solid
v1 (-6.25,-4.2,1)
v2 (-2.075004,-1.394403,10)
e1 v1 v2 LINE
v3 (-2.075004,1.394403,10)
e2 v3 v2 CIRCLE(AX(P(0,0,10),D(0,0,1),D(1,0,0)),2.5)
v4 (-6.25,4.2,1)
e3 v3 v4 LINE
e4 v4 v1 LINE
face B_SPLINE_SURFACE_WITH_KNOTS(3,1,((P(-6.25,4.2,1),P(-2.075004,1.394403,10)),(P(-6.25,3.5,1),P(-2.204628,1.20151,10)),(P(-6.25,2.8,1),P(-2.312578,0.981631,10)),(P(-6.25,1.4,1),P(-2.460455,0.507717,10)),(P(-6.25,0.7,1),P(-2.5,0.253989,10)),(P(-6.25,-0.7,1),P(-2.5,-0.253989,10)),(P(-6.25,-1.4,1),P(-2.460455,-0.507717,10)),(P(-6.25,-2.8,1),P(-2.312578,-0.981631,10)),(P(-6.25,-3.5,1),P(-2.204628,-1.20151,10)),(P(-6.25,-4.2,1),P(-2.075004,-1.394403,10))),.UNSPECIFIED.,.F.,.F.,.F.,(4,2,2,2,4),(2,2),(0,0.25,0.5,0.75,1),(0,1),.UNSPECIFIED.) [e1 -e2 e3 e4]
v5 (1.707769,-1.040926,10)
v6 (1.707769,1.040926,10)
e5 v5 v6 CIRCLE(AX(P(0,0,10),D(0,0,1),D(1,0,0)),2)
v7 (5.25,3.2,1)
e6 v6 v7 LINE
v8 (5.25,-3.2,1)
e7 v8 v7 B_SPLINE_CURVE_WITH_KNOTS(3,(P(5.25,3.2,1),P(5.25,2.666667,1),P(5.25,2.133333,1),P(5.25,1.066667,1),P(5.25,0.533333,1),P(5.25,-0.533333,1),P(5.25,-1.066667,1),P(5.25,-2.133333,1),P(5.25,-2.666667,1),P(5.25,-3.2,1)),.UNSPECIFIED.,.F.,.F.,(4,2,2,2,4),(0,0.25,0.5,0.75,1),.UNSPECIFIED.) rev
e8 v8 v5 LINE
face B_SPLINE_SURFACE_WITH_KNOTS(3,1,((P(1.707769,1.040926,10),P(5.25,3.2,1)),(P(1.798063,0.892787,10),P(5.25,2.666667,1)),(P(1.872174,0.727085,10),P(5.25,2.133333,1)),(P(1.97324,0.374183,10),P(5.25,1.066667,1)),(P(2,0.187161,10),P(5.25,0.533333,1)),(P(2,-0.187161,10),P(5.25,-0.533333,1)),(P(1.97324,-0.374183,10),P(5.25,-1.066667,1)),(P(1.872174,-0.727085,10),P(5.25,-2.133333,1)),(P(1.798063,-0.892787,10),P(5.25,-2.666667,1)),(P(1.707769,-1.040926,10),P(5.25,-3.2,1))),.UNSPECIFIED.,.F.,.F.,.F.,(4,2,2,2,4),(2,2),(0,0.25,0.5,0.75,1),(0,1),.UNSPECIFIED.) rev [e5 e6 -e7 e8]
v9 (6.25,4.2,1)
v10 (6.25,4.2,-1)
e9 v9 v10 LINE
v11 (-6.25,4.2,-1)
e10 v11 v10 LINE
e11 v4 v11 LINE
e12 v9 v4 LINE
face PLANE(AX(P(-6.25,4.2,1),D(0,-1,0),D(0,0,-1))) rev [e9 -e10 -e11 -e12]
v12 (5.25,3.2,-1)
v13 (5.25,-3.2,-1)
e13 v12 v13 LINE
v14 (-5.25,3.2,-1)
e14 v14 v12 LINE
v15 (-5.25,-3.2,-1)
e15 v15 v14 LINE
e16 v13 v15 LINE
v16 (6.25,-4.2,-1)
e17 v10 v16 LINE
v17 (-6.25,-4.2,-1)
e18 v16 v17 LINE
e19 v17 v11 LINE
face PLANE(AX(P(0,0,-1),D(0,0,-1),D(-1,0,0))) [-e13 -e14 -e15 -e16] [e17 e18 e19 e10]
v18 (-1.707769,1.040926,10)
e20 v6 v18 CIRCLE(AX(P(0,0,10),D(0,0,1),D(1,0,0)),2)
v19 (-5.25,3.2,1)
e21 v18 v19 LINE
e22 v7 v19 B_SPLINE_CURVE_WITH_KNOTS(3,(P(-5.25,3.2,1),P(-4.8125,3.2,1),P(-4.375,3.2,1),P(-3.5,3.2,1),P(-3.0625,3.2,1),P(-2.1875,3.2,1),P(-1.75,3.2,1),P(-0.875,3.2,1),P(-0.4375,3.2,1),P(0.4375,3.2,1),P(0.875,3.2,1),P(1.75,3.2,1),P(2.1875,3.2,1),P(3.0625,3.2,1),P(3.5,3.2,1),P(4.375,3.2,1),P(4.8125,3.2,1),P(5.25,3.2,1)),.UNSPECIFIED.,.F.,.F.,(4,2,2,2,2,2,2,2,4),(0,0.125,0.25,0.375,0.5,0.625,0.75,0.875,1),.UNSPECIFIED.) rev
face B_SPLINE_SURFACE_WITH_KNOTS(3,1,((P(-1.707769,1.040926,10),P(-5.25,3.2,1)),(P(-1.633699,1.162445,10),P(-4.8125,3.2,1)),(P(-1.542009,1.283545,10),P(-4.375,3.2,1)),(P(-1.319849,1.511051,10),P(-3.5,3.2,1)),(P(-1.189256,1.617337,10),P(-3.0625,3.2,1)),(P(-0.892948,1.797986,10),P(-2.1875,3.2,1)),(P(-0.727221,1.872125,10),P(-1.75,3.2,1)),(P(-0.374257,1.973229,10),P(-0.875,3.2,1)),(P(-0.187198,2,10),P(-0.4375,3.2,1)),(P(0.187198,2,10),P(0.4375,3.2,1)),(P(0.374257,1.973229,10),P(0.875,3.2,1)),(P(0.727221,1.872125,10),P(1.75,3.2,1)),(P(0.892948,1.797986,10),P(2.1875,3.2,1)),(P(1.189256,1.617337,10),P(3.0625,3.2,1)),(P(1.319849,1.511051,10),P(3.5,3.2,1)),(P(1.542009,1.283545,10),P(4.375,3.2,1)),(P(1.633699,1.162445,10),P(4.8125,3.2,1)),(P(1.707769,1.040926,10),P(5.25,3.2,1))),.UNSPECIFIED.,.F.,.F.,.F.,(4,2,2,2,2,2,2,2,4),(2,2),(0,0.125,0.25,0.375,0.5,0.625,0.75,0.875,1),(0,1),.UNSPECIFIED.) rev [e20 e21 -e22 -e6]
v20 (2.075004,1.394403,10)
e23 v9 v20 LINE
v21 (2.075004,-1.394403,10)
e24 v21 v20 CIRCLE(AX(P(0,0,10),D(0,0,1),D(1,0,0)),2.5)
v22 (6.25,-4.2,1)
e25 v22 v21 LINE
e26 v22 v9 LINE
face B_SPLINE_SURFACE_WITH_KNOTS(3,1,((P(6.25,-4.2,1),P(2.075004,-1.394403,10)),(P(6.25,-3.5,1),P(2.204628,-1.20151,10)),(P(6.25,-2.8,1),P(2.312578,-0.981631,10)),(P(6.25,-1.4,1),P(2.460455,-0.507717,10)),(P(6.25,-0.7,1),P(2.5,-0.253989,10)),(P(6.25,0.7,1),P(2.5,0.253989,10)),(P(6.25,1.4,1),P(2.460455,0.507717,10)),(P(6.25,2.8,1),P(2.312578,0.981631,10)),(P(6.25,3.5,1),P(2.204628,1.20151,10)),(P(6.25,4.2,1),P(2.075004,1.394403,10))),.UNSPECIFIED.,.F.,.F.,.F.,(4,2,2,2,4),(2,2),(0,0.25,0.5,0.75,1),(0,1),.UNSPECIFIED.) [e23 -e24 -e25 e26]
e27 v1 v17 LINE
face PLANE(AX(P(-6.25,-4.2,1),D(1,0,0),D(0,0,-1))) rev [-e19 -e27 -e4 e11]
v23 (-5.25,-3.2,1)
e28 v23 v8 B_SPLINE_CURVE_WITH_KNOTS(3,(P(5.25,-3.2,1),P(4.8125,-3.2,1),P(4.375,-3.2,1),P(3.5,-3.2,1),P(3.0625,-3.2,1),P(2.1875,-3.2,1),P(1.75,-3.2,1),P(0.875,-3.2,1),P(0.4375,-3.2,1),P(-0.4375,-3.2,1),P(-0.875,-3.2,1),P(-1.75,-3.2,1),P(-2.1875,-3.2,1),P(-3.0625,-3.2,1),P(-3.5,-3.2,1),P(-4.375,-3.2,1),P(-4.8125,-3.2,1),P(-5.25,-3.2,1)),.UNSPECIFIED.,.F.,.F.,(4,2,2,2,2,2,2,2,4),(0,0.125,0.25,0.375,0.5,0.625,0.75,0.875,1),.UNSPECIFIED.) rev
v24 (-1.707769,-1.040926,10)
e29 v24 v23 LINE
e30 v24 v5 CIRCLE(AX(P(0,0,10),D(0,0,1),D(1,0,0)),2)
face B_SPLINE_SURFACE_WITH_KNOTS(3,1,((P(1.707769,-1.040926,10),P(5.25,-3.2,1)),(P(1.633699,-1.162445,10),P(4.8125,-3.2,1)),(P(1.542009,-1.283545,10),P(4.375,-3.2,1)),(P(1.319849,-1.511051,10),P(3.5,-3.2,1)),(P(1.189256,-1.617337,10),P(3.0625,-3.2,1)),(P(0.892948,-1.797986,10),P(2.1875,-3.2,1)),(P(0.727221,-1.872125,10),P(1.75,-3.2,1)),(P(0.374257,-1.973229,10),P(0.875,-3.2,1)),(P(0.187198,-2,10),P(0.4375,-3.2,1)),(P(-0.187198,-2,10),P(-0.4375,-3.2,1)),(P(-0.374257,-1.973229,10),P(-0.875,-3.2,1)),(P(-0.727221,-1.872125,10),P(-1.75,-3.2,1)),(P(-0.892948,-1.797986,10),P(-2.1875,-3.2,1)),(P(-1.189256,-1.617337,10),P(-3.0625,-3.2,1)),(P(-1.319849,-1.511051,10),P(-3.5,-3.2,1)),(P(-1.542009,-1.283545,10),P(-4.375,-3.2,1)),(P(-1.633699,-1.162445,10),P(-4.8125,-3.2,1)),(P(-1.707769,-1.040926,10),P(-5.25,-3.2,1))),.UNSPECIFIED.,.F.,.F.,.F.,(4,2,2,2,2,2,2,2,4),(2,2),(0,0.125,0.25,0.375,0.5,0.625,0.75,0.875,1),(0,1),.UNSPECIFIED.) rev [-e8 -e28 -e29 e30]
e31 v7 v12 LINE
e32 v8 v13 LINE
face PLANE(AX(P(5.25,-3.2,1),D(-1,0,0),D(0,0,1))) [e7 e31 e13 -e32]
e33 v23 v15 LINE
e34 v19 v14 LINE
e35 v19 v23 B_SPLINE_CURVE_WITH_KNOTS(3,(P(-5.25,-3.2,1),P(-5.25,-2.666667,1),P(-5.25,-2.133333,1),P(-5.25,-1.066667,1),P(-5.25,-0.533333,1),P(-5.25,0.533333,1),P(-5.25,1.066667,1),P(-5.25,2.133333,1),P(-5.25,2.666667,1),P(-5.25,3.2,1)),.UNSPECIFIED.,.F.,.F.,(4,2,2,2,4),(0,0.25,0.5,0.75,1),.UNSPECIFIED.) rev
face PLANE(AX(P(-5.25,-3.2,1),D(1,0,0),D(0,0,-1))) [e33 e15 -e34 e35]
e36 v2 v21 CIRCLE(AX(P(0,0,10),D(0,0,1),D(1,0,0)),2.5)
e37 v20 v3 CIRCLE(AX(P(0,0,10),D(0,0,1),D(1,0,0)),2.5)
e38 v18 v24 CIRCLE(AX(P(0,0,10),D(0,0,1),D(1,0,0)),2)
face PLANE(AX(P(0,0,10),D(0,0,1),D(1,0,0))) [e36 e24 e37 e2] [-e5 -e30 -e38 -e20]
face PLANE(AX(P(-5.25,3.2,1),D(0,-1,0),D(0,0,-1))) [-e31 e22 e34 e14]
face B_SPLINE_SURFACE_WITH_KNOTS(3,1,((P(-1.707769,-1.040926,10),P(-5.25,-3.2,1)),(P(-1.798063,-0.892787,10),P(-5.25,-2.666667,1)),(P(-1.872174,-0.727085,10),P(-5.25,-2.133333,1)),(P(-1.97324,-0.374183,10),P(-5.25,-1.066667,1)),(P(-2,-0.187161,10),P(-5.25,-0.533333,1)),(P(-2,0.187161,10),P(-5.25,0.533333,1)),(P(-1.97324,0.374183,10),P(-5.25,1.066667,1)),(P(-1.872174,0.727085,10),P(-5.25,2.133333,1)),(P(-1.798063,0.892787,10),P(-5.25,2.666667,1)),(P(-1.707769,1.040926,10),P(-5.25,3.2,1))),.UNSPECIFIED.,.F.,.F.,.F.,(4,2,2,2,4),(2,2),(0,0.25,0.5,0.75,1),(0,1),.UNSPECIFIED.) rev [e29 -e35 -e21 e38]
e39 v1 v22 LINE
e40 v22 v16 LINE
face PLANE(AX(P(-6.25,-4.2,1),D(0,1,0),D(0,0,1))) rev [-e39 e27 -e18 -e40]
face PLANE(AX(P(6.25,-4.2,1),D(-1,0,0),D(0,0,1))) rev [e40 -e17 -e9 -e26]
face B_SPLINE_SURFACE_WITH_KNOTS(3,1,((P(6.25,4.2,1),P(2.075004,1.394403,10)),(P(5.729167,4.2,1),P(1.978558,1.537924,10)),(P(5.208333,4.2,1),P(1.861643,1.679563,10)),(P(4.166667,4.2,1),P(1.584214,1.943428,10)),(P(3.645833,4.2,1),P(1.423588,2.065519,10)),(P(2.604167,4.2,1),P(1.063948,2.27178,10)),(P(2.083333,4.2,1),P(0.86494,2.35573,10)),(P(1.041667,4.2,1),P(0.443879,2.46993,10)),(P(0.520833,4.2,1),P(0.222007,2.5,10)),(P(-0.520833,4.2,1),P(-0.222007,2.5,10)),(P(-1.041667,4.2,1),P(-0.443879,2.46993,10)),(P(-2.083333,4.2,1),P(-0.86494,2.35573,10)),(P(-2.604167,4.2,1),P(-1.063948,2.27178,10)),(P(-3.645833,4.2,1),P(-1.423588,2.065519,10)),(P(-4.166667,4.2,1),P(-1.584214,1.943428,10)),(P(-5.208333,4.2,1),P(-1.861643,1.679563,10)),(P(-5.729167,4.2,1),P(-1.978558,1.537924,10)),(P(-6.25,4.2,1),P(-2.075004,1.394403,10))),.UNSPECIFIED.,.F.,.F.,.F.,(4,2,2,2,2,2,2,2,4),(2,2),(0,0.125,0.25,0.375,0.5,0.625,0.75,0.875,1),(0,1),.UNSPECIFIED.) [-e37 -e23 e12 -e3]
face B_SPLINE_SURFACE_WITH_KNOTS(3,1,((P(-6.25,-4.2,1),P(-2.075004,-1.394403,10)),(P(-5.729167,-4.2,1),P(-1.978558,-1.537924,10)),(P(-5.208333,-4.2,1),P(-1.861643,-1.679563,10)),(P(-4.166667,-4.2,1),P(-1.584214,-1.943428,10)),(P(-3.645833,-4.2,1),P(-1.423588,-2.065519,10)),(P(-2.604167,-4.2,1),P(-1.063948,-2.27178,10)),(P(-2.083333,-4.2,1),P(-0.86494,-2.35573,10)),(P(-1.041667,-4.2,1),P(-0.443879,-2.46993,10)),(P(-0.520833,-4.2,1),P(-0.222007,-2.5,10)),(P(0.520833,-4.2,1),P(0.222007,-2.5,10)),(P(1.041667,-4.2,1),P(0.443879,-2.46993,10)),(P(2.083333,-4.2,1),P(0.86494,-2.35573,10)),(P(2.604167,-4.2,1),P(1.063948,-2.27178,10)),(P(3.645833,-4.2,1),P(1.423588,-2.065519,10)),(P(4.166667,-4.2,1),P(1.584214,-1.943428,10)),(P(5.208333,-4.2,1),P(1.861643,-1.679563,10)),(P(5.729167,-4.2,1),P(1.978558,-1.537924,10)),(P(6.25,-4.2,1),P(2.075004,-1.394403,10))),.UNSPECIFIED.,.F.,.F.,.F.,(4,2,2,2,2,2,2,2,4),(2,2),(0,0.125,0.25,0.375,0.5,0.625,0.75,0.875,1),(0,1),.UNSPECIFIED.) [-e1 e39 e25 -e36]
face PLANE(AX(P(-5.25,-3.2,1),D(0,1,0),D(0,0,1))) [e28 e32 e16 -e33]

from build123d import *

# Parameters (mm, degrees)
SKETCH1_W           = 12.5
SKETCH1_H           = 8.4
SKETCH1_W_2         = 10.5
SKETCH1_H_2         = 6.4
BOSS_EXTRUDE1_DEPTH = 1
SKETCH6_W           = 12.5
SKETCH6_H           = 8.4
BOSS_EXTRUDE2_DEPTH = 1
SKETCH7_W           = 10.5
SKETCH7_H           = 6.4
CUT_EXTRUDE1_DEPTH  = 1


with BuildPart() as part:
    # Sketch1 → Boss-Extrude1 (new body)
    with BuildSketch(Plane.XY):
        Rectangle(SKETCH1_W, SKETCH1_H)
        Rectangle(SKETCH1_W_2, SKETCH1_H_2, mode=Mode.SUBTRACT)
    extrude(amount=BOSS_EXTRUDE1_DEPTH)

    # Sketch3 → Loft1 section 0
    with BuildSketch(Plane.XY.offset(1)):
        with BuildLine():
            Line((6.25, -4.2), (6.25, 4.2))
            Line((6.25, 4.2), (-6.25, 4.2))
            Line((-6.25, 4.2), (-6.25, -4.2))
            Line((-6.25, -4.2), (6.25, -4.2))
        make_face()
    # Sketch2 for Loft1 → Loft1 section 1
    with BuildSketch(Plane.XY.offset(10)):
        with BuildLine():
            # circular arc as an exact rational Bezier (weights 1, cos(half-angle), 1)
            Bezier((2.075003924, -1.394402637), (3.012042497, 0), (2.075003924, 1.394402637), weights=[1, 0.830001569, 1])
            Bezier((2.075003924, 1.394402637), (0, 4.482206096), (-2.075003924, 1.394402637), weights=[1, 0.557761055, 1])
            Bezier((-2.075003924, 1.394402637), (-3.012042497, 0), (-2.075003924, -1.394402637), weights=[1, 0.830001569, 1])
            Bezier((-2.075003924, -1.394402637), (0, -4.482206096), (2.075003924, -1.394402637), weights=[1, 0.557761055, 1])
        make_face()
    loft()

    # Cut-Loft1: read off the stored shape, not the designer's step
    # Cut-Loft1: loft between two sections, ruled curve by curve
    cut_loft1_from = [
        Edge.make_bspline([(1.707768655, -1.040925656, 10), (1.633699479, -1.162445397, 10), (1.542008876, -1.28354475, 10), (1.31984949, -1.511051231, 10), (1.189256111, -1.617336715, 10), (0.892947872, -1.797985608, 10), (0.72722112, -1.87212471, 10), (0.374256765, -1.973229171, 10), (0.187198335, -2, 10), (-0.187198335, -2, 10), (-0.374256765, -1.973229171, 10), (-0.72722112, -1.87212471, 10), (-0.892947872, -1.797985608, 10), (-1.189256111, -1.617336715, 10), (-1.31984949, -1.511051231, 10), (-1.542008876, -1.28354475, 10), (-1.633699479, -1.162445397, 10), (-1.707768655, -1.040925656, 10)], [0, 0, 0, 0, 0.125, 0.125, 0.25, 0.25, 0.375, 0.375, 0.5, 0.5, 0.625, 0.625, 0.75, 0.75, 0.875, 0.875, 1, 1, 1, 1], 3),
        Edge.make_bspline([(-1.707768655, -1.040925656, 10), (-1.798062507, -0.892787306, 10), (-1.872174068, -0.727085204, 10), (-1.973239973, -0.374182636, 10), (-2, -0.187161202, 10), (-2, 0.187161202, 10), (-1.973239973, 0.374182636, 10), (-1.872174068, 0.727085204, 10), (-1.798062507, 0.892787306, 10), (-1.707768655, 1.040925656, 10)], [0, 0, 0, 0, 0.25, 0.25, 0.5, 0.5, 0.75, 0.75, 1, 1, 1, 1], 3),
        Edge.make_bspline([(1.707768655, 1.040925656, 10), (1.798062507, 0.892787306, 10), (1.872174068, 0.727085204, 10), (1.973239973, 0.374182636, 10), (2, 0.187161202, 10), (2, -0.187161202, 10), (1.973239973, -0.374182636, 10), (1.872174068, -0.727085204, 10), (1.798062507, -0.892787306, 10), (1.707768655, -1.040925656, 10)], [0, 0, 0, 0, 0.25, 0.25, 0.5, 0.5, 0.75, 0.75, 1, 1, 1, 1], 3),
        Edge.make_bspline([(-1.707768655, 1.040925656, 10), (-1.633699479, 1.162445397, 10), (-1.542008876, 1.28354475, 10), (-1.31984949, 1.511051231, 10), (-1.189256111, 1.617336715, 10), (-0.892947872, 1.797985608, 10), (-0.72722112, 1.87212471, 10), (-0.374256765, 1.973229171, 10), (-0.187198335, 2, 10), (0.187198335, 2, 10), (0.374256765, 1.973229171, 10), (0.72722112, 1.87212471, 10), (0.892947872, 1.797985608, 10), (1.189256111, 1.617336715, 10), (1.31984949, 1.511051231, 10), (1.542008876, 1.28354475, 10), (1.633699479, 1.162445397, 10), (1.707768655, 1.040925656, 10)], [0, 0, 0, 0, 0.125, 0.125, 0.25, 0.25, 0.375, 0.375, 0.5, 0.5, 0.625, 0.625, 0.75, 0.75, 0.875, 0.875, 1, 1, 1, 1], 3),
    ]
    cut_loft1_to = [
        Edge.make_bspline([(5.25, -3.2, 1), (4.8125, -3.2, 1), (4.375, -3.2, 1), (3.5, -3.2, 1), (3.0625, -3.2, 1), (2.1875, -3.2, 1), (1.75, -3.2, 1), (0.875, -3.2, 1), (0.4375, -3.2, 1), (-0.4375, -3.2, 1), (-0.875, -3.2, 1), (-1.75, -3.2, 1), (-2.1875, -3.2, 1), (-3.0625, -3.2, 1), (-3.5, -3.2, 1), (-4.375, -3.2, 1), (-4.8125, -3.2, 1), (-5.25, -3.2, 1)], [0, 0, 0, 0, 0.125, 0.125, 0.25, 0.25, 0.375, 0.375, 0.5, 0.5, 0.625, 0.625, 0.75, 0.75, 0.875, 0.875, 1, 1, 1, 1], 3),
        Edge.make_bspline([(-5.25, -3.2, 1), (-5.25, -2.666666667, 1), (-5.25, -2.133333333, 1), (-5.25, -1.066666667, 1), (-5.25, -0.533333333, 1), (-5.25, 0.533333333, 1), (-5.25, 1.066666667, 1), (-5.25, 2.133333333, 1), (-5.25, 2.666666667, 1), (-5.25, 3.2, 1)], [0, 0, 0, 0, 0.25, 0.25, 0.5, 0.5, 0.75, 0.75, 1, 1, 1, 1], 3),
        Edge.make_bspline([(5.25, 3.2, 1), (5.25, 2.666666667, 1), (5.25, 2.133333333, 1), (5.25, 1.066666667, 1), (5.25, 0.533333333, 1), (5.25, -0.533333333, 1), (5.25, -1.066666667, 1), (5.25, -2.133333333, 1), (5.25, -2.666666667, 1), (5.25, -3.2, 1)], [0, 0, 0, 0, 0.25, 0.25, 0.5, 0.5, 0.75, 0.75, 1, 1, 1, 1], 3),
        Edge.make_bspline([(-5.25, 3.2, 1), (-4.8125, 3.2, 1), (-4.375, 3.2, 1), (-3.5, 3.2, 1), (-3.0625, 3.2, 1), (-2.1875, 3.2, 1), (-1.75, 3.2, 1), (-0.875, 3.2, 1), (-0.4375, 3.2, 1), (0.4375, 3.2, 1), (0.875, 3.2, 1), (1.75, 3.2, 1), (2.1875, 3.2, 1), (3.0625, 3.2, 1), (3.5, 3.2, 1), (4.375, 3.2, 1), (4.8125, 3.2, 1), (5.25, 3.2, 1)], [0, 0, 0, 0, 0.125, 0.125, 0.25, 0.25, 0.375, 0.375, 0.5, 0.5, 0.625, 0.625, 0.75, 0.75, 0.875, 0.875, 1, 1, 1, 1], 3),
    ]
    cut_loft1 = Solid(Shell([*[Face.make_surface_from_curves(cut_loft1_from[k], cut_loft1_to[k]) for k in range(4)], Face(Wire(cut_loft1_from)), Face(Wire(cut_loft1_to))]))
    add(cut_loft1, mode=Mode.SUBTRACT)

    # Sketch6 → Boss-Extrude2 (add)
    with BuildSketch(Plane(origin=(0, 0, 0), x_dir=(-1, 0, 0), z_dir=(0, 0, -1))):
        Rectangle(SKETCH6_W, SKETCH6_H)
    extrude(amount=BOSS_EXTRUDE2_DEPTH)

    # Sketch7 → Cut-Extrude1 (cut)
    with BuildSketch(Plane(origin=(0, 0, -1), x_dir=(-1, 0, 0), z_dir=(0, 0, -1))):
        Rectangle(SKETCH7_W, SKETCH7_H)
    extrude(amount=-CUT_EXTRUDE1_DEPTH, mode=Mode.SUBTRACT)


solid = part.part
